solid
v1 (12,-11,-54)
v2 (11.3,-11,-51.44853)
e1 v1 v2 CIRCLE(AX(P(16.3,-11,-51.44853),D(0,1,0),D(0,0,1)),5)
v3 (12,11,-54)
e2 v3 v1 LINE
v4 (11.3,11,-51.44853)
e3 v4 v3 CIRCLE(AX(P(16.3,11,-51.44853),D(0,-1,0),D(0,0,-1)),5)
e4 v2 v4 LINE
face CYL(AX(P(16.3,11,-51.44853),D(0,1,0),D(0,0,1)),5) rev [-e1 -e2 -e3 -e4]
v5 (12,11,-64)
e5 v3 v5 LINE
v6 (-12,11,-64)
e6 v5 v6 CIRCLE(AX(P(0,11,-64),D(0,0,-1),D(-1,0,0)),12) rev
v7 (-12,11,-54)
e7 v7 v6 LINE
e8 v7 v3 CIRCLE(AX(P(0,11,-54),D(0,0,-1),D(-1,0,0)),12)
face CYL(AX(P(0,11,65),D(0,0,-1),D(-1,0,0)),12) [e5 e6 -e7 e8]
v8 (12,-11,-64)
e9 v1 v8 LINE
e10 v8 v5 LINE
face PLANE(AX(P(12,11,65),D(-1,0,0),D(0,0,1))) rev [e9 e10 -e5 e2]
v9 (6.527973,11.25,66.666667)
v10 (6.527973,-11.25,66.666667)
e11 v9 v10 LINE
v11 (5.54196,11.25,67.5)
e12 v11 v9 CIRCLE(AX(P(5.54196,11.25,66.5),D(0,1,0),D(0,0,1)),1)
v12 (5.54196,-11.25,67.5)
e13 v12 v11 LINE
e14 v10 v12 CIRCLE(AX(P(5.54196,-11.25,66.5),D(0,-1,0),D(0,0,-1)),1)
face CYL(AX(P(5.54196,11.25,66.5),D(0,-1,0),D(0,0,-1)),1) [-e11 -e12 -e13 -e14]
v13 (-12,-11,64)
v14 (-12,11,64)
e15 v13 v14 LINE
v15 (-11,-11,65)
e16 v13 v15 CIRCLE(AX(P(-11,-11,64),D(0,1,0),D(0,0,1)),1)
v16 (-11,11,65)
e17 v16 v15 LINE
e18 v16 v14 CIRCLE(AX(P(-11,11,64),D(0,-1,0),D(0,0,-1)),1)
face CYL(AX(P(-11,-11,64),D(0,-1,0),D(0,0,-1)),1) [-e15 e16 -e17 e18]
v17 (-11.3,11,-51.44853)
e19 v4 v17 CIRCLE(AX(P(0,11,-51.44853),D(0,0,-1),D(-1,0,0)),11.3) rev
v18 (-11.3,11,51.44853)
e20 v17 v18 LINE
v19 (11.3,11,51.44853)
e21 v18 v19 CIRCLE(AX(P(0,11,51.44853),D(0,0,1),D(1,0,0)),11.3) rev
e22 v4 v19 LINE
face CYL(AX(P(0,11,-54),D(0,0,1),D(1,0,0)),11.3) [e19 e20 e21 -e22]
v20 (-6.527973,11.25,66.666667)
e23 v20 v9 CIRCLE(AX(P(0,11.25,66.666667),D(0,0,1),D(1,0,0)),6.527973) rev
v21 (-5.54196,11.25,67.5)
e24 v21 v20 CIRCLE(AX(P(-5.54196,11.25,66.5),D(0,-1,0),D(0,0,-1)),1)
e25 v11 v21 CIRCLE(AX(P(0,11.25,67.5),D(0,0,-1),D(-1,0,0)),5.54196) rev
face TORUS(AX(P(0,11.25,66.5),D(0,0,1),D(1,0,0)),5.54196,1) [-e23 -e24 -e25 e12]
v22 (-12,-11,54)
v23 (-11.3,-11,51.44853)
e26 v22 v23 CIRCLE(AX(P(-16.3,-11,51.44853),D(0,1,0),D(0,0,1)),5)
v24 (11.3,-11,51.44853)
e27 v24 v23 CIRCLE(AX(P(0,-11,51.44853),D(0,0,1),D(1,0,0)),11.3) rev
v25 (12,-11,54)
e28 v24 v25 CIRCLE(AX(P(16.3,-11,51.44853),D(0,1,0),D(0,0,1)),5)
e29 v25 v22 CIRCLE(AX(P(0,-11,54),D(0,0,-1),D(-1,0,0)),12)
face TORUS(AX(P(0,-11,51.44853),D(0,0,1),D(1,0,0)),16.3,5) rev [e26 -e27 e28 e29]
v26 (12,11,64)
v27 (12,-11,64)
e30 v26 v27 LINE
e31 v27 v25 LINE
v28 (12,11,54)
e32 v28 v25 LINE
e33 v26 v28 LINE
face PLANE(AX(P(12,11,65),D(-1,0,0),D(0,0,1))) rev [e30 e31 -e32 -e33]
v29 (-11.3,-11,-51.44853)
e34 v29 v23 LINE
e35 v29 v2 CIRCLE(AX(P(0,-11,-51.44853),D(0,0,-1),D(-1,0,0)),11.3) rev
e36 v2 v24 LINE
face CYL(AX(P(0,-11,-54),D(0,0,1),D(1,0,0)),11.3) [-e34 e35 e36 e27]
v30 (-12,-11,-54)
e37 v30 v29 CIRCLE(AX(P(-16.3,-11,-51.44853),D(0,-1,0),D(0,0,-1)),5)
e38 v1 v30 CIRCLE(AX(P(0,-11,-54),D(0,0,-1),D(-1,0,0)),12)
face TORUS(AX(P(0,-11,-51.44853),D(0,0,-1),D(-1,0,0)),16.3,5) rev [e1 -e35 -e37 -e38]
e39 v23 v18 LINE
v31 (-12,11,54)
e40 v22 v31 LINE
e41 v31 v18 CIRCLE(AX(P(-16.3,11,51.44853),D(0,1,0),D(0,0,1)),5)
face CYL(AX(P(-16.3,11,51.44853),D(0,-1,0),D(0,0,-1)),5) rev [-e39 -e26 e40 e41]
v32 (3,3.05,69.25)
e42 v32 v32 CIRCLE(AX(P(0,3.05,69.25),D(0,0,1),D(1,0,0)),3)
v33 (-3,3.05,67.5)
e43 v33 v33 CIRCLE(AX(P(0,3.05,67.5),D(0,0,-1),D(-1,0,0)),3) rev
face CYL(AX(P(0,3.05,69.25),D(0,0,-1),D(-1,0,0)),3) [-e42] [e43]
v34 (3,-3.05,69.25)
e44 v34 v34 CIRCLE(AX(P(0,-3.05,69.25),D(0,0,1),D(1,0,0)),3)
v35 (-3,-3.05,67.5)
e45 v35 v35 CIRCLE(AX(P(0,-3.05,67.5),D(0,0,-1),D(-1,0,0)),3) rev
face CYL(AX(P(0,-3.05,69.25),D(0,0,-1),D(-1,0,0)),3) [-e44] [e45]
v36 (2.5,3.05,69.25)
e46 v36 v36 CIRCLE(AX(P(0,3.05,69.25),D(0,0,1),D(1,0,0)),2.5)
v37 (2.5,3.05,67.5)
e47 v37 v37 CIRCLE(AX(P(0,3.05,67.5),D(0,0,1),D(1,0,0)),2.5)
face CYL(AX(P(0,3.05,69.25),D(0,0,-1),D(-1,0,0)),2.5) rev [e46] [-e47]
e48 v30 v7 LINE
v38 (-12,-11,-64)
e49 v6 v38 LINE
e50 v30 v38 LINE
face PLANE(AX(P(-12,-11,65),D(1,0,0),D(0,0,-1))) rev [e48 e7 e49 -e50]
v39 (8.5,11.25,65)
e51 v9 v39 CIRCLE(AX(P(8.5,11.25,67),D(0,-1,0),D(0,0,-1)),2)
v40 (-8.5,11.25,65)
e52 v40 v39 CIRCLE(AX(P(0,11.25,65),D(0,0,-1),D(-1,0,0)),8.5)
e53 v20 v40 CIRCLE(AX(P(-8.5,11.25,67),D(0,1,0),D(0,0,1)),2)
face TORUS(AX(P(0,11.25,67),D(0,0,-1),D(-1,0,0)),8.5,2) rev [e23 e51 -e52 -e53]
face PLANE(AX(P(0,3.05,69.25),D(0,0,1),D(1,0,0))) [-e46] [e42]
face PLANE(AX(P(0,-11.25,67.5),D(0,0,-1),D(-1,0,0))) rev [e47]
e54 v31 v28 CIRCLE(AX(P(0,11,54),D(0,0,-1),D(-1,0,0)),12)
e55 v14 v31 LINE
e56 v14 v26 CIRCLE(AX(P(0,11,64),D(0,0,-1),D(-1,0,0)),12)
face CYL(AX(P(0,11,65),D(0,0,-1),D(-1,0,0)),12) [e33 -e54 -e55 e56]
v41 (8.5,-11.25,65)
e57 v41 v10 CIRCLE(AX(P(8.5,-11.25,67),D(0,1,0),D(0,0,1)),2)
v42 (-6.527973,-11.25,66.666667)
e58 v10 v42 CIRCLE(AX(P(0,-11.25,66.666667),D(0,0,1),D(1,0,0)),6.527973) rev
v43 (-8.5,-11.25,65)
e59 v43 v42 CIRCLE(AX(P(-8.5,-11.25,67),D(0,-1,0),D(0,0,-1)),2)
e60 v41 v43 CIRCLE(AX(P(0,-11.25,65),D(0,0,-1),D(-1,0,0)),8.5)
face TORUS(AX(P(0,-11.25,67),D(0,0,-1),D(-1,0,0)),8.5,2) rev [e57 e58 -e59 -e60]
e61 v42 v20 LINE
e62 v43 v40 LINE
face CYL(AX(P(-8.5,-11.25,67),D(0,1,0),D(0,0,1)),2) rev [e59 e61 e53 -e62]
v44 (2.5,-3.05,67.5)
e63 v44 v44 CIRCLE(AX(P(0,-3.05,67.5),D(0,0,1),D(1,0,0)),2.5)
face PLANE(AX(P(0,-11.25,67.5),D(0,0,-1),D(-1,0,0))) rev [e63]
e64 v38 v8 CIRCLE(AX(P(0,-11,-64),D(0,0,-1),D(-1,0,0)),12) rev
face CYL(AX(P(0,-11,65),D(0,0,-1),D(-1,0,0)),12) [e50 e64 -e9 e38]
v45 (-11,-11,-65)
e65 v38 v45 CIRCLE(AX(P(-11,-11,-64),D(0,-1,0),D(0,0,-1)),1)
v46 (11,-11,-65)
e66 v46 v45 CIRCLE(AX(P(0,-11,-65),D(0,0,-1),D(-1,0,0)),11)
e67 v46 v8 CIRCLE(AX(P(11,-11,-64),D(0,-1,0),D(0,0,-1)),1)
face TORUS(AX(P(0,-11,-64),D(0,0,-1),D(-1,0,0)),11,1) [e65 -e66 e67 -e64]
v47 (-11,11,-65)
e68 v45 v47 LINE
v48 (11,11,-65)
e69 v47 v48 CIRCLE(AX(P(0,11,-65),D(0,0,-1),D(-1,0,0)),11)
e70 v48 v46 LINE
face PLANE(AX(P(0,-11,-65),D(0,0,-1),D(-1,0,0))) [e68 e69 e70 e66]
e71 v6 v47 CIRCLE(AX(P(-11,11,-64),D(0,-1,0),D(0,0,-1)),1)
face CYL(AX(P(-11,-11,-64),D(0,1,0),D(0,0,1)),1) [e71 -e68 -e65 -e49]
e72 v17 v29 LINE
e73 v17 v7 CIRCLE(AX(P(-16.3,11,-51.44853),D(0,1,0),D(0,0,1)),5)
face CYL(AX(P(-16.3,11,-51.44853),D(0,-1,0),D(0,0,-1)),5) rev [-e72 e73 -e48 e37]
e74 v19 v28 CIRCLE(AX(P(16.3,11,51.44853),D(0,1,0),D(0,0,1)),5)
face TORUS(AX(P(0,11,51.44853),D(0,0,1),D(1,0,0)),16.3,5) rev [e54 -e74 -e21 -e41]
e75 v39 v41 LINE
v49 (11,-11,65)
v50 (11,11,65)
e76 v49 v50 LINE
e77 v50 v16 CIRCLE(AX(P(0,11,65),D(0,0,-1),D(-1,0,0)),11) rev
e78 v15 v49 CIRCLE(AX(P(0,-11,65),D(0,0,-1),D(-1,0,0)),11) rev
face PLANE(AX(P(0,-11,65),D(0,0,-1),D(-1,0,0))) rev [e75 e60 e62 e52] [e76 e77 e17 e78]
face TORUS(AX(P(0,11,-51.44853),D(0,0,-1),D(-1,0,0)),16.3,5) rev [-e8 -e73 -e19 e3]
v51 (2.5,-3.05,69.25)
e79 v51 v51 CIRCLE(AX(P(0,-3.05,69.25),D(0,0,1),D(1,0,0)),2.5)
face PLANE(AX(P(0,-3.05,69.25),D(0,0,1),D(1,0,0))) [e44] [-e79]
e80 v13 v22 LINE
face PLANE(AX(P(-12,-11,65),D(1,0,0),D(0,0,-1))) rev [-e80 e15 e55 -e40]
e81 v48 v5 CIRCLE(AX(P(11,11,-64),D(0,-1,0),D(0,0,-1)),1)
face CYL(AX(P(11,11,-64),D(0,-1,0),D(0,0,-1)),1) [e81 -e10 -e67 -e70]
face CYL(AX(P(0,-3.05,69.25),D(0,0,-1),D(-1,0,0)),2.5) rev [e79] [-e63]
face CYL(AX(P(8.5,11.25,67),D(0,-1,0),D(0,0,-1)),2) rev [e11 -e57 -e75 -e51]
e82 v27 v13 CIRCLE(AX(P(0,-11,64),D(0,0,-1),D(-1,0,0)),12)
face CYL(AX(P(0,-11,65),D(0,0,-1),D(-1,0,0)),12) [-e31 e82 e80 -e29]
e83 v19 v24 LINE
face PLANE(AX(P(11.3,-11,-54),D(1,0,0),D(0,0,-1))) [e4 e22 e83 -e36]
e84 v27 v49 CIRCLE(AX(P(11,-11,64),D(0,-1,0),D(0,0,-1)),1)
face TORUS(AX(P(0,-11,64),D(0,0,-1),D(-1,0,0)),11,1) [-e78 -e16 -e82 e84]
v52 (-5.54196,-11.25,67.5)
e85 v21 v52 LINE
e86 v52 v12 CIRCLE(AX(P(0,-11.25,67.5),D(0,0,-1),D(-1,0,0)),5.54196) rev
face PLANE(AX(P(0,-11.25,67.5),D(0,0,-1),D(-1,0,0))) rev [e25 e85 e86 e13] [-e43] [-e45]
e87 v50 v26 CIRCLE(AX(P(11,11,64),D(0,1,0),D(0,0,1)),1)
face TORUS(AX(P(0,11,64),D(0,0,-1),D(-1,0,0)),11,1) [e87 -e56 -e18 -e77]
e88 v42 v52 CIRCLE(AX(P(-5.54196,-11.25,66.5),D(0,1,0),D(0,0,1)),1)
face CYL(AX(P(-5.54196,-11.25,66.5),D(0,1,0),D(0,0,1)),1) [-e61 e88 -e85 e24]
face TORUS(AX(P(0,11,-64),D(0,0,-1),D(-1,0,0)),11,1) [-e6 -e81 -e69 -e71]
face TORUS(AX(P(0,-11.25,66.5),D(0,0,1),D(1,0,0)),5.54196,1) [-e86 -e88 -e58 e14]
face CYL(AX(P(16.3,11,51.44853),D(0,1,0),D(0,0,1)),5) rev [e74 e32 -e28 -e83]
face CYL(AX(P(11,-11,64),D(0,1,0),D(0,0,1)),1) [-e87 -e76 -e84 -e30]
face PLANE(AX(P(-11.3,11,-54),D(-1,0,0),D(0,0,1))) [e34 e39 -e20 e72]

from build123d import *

# Parameters (mm, degrees)
BOSS_EXTRUDE2_DEPTH = 65
CUT_EXTRUDE1_DEPTH  = 54
FILLET1_R           = 5
FILLET2_R           = 1
BOSS_EXTRUDE3_DEPTH = 2.5
FILLET4_R           = 2
FILLET5_R           = 1
SKETCH4_R           = 3
SKETCH4_R_2         = 2.5
BOSS_EXTRUDE8_DEPTH = 1.75


with BuildPart() as part:
    # Sketch1 → Boss-Extrude2 (new, symmetric)
    with BuildSketch(Plane.XY):
        with BuildLine():
            Line((-12, -11), (-12, 11))
            ThreePointArc((-12, 11), (0, 23), (12, 11))
            Line((12, 11), (12, -11))
            ThreePointArc((12, -11), (0, -23), (-12, -11))
        make_face()
    extrude(amount=BOSS_EXTRUDE2_DEPTH, both=True)

    # Sketch2 → Cut-Extrude1 (cut, symmetric)
    with BuildSketch(Plane.XY):
        with BuildLine():
            Line((15, 11), (15, -11))
            ThreePointArc((15, -11), (0, -26), (-15, -11))
            Line((-15, -11), (-15, 11))
            ThreePointArc((-15, 11), (0, 26), (15, 11))
        make_face()
        with BuildLine():
            Line((-11.3, 11), (-11.3, -11))
            ThreePointArc((-11.3, -11), (0, -22.3), (11.3, -11))
            Line((11.3, -11), (11.3, 11))
            ThreePointArc((11.3, 11), (0, 22.3), (-11.3, 11))
        make_face(mode=Mode.SUBTRACT)
    extrude(amount=CUT_EXTRUDE1_DEPTH, both=True, mode=Mode.SUBTRACT)

    # Fillet1
    # the kernel refuses this fillet: 5 mm, written as the material it adds along each edge
    with BuildSketch(Plane(origin=(0, 11, -54), x_dir=(1, 0, 0), z_dir=(0, -1, 0))) as fillet1_piece_1:
        with BuildLine():
            CenterArc((16.3, 2.551470164), FILLET1_R, 180, 30.683417109)
            Line((11.3, 2.551470164), (11.2, 2.551470164))
            Line((11.2, 2.551470164), (11.2, 0))
            Line((11.2, 0), (11.3, -0.1))
            ThreePointArc((11.3, -0.1), (11.65, -0.1), (11.914, -0.051029403))
            Line((11.914, -0.051029403), (12, 0))
        make_face()
    revolve(axis=Axis((0, 11, -54), (0, 0, 1)), revolution_arc=180)
    with BuildSketch(Plane(origin=(-11.3, 11, -54), x_dir=(-1, 0, 0), z_dir=(0, -1, 0)), Plane(origin=(11.3, -11, -54), x_dir=(1, 0, 0), z_dir=(0, 1, 0))) as fillet1_piece_2:
        with BuildLine():
            CenterArc((5, -2.551470164), FILLET1_R, 149.316582891, 30.683417109)
            Line((0, -2.551470164), (-0.1, -2.551470164))
            Line((-0.1, -2.551470164), (-0.1, 0))
            Line((-0.1, 0), (0, 0.1))
            ThreePointArc((0, 0.1), (0.35, 0.1), (0.614, 0.051029403))
            Line((0.614, 0.051029403), (0.7, 0))
        make_face()
    extrude(amount=22)
    with BuildSketch(Plane(origin=(0, -11, -54), x_dir=(-1, 0, 0), z_dir=(0, 1, 0))) as fillet1_piece_3:
        with BuildLine():
            CenterArc((16.3, 2.551470164), FILLET1_R, 180, 30.683417109)
            Line((11.3, 2.551470164), (11.2, 2.551470164))
            Line((11.2, 2.551470164), (11.2, 0))
            Line((11.2, 0), (11.3, -0.1))
            ThreePointArc((11.3, -0.1), (11.65, -0.1), (11.914, -0.051029403))
            Line((11.914, -0.051029403), (12, 0))
        make_face()
    revolve(axis=Axis((0, -11, -54), (0, 0, 1)), revolution_arc=180)
    with BuildSketch(Plane(origin=(0, 11, 54), x_dir=(1, 0, 0), z_dir=(0, -1, 0))) as fillet1_piece_4:
        with BuildLine():
            CenterArc((16.3, -2.551470164), FILLET1_R, 149.316582891, 30.683417109)
            Line((12, 0), (11.914, 0.051029403))
            ThreePointArc((11.914, 0.051029403), (11.65, 0.1), (11.3, 0.1))
            Line((11.3, 0.1), (11.2, 0))
            Line((11.2, 0), (11.2, -2.551470164))
            Line((11.2, -2.551470164), (11.3, -2.551470164))
        make_face()
    revolve(axis=Axis((0, 11, 54), (0, 0, 1)), revolution_arc=180)
    with BuildSketch(Plane(origin=(11.3, -11, 54), x_dir=(0, 0, -1), z_dir=(0, 1, 0)), Plane(origin=(-11.3, 11, 54), x_dir=(0, 0, -1), z_dir=(0, -1, 0))) as fillet1_piece_5:
        with BuildLine():
            CenterArc((2.551470164, -5), FILLET1_R, 90, 30.683417109)
            Line((0, -0.7), (-0.051029403, -0.614))
            ThreePointArc((-0.051029403, -0.614), (-0.1, -0.35), (-0.1, 0))
            Line((-0.1, 0), (0, 0.1))
            Line((0, 0.1), (2.551470164, 0.1))
            Line((2.551470164, 0.1), (2.551470164, 0))
        make_face()
    extrude(amount=22)
    with BuildSketch(Plane(origin=(0, -11, 54), x_dir=(-1, 0, 0), z_dir=(0, 1, 0))) as fillet1_piece_6:
        with BuildLine():
            CenterArc((16.3, -2.551470164), FILLET1_R, 149.316582891, 30.683417109)
            Line((12, 0), (11.914, 0.051029403))
            ThreePointArc((11.914, 0.051029403), (11.65, 0.1), (11.3, 0.1))
            Line((11.3, 0.1), (11.2, 0))
            Line((11.2, 0), (11.2, -2.551470164))
            Line((11.2, -2.551470164), (11.3, -2.551470164))
        make_face()
    revolve(axis=Axis((0, -11, 54), (0, 0, 1)), revolution_arc=180)

    # Fillet2
    fillet2_edges = [part.edges().sort_by_distance(p)[0] for p in [
        (0, 23, 65),
        (-12, 0, 65),
        (0, -23, 65),
        (-12, 0, -65),
        (0, 23, -65),
        (12, 0, -65),
        (0, -23, -65),
        (12, 0, 65),
    ]]
    fillet(fillet2_edges, radius=FILLET2_R)

    # Sketch3 → Boss-Extrude3 (add)
    with BuildSketch(Plane.XY.offset(65)):
        with BuildLine():
            Line((-6.5, -11.25), (-6.5, 11.25))
            ThreePointArc((-6.5, 11.25), (0, 17.75), (6.5, 11.25))
            Line((6.5, 11.25), (6.5, -11.25))
            ThreePointArc((6.5, -11.25), (0, -17.75), (-6.5, -11.25))
        make_face()
    extrude(amount=BOSS_EXTRUDE3_DEPTH)

    # Fillet4
    fillet4_edges = [part.edges().sort_by_distance(p)[0] for p in [
        (0, -17.75, 65),
        (6.5, 0, 65),
        (0, 17.75, 65),
        (-6.5, 0, 65),
    ]]
    fillet(fillet4_edges, radius=FILLET4_R)

    # Fillet5
    # the kernel refuses this fillet: 1 mm, written as the material it takes off along each edge
    with BuildSketch(Plane(origin=(-6.5, -11.25, 67.5), x_dir=(-0.03354919019221856, 0, -0.9994370674722076), z_dir=(0, 1, 0)), Plane(origin=(6.5, 11.25, 67.5), x_dir=(0.03354919019221963, 0, -0.9994370674722076), z_dir=(0, -1, 0))) as fillet5_piece_1:
        with BuildLine():
            CenterArc((0.967295605, -0.99104977), FILLET5_R, 97.671480447, 80.405931773)
            Line((-0.032141463, -0.95750058), (-0.132085169, -0.954145661))
            Line((-0.132085169, -0.954145661), (-0.099943707, 0.003354919))
            Line((-0.099943707, 0.003354919), (0.003354919, 0.099943707))
            ThreePointArc((0.003354919, 0.099943707), (0.503073453, 0.083169112), (0.820453418, 0.099104977))
            Line((0.820453418, 0.099104977), (0.833802708, 0))
        make_face()
    extrude(amount=22.5, mode=Mode.SUBTRACT)
    with BuildSketch(Plane(origin=(0, 11.25, 67.5), x_dir=(-1, 0, 0), z_dir=(0, -1, 0))) as fillet5_piece_2:
        with BuildLine():
            CenterArc((5.541960108, 1), FILLET5_R, 270, 80.405931773)
            Line((5.541960108, 0), (5.541960108, -0.1))
            Line((5.541960108, -0.1), (6.5, -0.1))
            Line((6.5, -0.1), (6.6, 0))
            ThreePointArc((6.6, 0), (6.6, 0.5), (6.626574735, 0.816666667))
            Line((6.626574735, 0.816666667), (6.527973406, 0.833333333))
        make_face()
    revolve(axis=Axis((0, 11.25, 67.5), (0, 0, -1)), revolution_arc=180, mode=Mode.SUBTRACT)
    with BuildSketch(Plane(origin=(0, -11.25, 67.5), x_dir=(1, 0, 0), z_dir=(0, 1, 0))) as fillet5_piece_3:
        with BuildLine():
            CenterArc((5.541960108, 1), FILLET5_R, 270, 80.405931773)
            Line((5.541960108, 0), (5.541960108, -0.1))
            Line((5.541960108, -0.1), (6.5, -0.1))
            Line((6.5, -0.1), (6.6, 0))
            ThreePointArc((6.6, 0), (6.6, 0.5), (6.626574735, 0.816666667))
            Line((6.626574735, 0.816666667), (6.527973406, 0.833333333))
        make_face()
    revolve(axis=Axis((0, -11.25, 67.5), (0, 0, -1)), revolution_arc=180, mode=Mode.SUBTRACT)

    # Sketch4 → Boss-Extrude8 (add)
    # profile 1 of 2: a face of its own
    with BuildSketch(Plane.XY.offset(67.5)):
        with Locations(Location((0, 3.05, 0), (0, 0, 180))):
            Circle(SKETCH4_R)
        with Locations((0, 3.05)):
            Circle(SKETCH4_R_2, mode=Mode.SUBTRACT)
    # profile 2 of 2: a face of its own
    with BuildSketch(Plane.XY.offset(67.5)):
        with Locations(Location((0, -3.05, 0), (0, 0, 180))):
            Circle(SKETCH4_R)
        with Locations((0, -3.05)):
            Circle(SKETCH4_R_2, mode=Mode.SUBTRACT)
    extrude(amount=BOSS_EXTRUDE8_DEPTH)


solid = part.part
